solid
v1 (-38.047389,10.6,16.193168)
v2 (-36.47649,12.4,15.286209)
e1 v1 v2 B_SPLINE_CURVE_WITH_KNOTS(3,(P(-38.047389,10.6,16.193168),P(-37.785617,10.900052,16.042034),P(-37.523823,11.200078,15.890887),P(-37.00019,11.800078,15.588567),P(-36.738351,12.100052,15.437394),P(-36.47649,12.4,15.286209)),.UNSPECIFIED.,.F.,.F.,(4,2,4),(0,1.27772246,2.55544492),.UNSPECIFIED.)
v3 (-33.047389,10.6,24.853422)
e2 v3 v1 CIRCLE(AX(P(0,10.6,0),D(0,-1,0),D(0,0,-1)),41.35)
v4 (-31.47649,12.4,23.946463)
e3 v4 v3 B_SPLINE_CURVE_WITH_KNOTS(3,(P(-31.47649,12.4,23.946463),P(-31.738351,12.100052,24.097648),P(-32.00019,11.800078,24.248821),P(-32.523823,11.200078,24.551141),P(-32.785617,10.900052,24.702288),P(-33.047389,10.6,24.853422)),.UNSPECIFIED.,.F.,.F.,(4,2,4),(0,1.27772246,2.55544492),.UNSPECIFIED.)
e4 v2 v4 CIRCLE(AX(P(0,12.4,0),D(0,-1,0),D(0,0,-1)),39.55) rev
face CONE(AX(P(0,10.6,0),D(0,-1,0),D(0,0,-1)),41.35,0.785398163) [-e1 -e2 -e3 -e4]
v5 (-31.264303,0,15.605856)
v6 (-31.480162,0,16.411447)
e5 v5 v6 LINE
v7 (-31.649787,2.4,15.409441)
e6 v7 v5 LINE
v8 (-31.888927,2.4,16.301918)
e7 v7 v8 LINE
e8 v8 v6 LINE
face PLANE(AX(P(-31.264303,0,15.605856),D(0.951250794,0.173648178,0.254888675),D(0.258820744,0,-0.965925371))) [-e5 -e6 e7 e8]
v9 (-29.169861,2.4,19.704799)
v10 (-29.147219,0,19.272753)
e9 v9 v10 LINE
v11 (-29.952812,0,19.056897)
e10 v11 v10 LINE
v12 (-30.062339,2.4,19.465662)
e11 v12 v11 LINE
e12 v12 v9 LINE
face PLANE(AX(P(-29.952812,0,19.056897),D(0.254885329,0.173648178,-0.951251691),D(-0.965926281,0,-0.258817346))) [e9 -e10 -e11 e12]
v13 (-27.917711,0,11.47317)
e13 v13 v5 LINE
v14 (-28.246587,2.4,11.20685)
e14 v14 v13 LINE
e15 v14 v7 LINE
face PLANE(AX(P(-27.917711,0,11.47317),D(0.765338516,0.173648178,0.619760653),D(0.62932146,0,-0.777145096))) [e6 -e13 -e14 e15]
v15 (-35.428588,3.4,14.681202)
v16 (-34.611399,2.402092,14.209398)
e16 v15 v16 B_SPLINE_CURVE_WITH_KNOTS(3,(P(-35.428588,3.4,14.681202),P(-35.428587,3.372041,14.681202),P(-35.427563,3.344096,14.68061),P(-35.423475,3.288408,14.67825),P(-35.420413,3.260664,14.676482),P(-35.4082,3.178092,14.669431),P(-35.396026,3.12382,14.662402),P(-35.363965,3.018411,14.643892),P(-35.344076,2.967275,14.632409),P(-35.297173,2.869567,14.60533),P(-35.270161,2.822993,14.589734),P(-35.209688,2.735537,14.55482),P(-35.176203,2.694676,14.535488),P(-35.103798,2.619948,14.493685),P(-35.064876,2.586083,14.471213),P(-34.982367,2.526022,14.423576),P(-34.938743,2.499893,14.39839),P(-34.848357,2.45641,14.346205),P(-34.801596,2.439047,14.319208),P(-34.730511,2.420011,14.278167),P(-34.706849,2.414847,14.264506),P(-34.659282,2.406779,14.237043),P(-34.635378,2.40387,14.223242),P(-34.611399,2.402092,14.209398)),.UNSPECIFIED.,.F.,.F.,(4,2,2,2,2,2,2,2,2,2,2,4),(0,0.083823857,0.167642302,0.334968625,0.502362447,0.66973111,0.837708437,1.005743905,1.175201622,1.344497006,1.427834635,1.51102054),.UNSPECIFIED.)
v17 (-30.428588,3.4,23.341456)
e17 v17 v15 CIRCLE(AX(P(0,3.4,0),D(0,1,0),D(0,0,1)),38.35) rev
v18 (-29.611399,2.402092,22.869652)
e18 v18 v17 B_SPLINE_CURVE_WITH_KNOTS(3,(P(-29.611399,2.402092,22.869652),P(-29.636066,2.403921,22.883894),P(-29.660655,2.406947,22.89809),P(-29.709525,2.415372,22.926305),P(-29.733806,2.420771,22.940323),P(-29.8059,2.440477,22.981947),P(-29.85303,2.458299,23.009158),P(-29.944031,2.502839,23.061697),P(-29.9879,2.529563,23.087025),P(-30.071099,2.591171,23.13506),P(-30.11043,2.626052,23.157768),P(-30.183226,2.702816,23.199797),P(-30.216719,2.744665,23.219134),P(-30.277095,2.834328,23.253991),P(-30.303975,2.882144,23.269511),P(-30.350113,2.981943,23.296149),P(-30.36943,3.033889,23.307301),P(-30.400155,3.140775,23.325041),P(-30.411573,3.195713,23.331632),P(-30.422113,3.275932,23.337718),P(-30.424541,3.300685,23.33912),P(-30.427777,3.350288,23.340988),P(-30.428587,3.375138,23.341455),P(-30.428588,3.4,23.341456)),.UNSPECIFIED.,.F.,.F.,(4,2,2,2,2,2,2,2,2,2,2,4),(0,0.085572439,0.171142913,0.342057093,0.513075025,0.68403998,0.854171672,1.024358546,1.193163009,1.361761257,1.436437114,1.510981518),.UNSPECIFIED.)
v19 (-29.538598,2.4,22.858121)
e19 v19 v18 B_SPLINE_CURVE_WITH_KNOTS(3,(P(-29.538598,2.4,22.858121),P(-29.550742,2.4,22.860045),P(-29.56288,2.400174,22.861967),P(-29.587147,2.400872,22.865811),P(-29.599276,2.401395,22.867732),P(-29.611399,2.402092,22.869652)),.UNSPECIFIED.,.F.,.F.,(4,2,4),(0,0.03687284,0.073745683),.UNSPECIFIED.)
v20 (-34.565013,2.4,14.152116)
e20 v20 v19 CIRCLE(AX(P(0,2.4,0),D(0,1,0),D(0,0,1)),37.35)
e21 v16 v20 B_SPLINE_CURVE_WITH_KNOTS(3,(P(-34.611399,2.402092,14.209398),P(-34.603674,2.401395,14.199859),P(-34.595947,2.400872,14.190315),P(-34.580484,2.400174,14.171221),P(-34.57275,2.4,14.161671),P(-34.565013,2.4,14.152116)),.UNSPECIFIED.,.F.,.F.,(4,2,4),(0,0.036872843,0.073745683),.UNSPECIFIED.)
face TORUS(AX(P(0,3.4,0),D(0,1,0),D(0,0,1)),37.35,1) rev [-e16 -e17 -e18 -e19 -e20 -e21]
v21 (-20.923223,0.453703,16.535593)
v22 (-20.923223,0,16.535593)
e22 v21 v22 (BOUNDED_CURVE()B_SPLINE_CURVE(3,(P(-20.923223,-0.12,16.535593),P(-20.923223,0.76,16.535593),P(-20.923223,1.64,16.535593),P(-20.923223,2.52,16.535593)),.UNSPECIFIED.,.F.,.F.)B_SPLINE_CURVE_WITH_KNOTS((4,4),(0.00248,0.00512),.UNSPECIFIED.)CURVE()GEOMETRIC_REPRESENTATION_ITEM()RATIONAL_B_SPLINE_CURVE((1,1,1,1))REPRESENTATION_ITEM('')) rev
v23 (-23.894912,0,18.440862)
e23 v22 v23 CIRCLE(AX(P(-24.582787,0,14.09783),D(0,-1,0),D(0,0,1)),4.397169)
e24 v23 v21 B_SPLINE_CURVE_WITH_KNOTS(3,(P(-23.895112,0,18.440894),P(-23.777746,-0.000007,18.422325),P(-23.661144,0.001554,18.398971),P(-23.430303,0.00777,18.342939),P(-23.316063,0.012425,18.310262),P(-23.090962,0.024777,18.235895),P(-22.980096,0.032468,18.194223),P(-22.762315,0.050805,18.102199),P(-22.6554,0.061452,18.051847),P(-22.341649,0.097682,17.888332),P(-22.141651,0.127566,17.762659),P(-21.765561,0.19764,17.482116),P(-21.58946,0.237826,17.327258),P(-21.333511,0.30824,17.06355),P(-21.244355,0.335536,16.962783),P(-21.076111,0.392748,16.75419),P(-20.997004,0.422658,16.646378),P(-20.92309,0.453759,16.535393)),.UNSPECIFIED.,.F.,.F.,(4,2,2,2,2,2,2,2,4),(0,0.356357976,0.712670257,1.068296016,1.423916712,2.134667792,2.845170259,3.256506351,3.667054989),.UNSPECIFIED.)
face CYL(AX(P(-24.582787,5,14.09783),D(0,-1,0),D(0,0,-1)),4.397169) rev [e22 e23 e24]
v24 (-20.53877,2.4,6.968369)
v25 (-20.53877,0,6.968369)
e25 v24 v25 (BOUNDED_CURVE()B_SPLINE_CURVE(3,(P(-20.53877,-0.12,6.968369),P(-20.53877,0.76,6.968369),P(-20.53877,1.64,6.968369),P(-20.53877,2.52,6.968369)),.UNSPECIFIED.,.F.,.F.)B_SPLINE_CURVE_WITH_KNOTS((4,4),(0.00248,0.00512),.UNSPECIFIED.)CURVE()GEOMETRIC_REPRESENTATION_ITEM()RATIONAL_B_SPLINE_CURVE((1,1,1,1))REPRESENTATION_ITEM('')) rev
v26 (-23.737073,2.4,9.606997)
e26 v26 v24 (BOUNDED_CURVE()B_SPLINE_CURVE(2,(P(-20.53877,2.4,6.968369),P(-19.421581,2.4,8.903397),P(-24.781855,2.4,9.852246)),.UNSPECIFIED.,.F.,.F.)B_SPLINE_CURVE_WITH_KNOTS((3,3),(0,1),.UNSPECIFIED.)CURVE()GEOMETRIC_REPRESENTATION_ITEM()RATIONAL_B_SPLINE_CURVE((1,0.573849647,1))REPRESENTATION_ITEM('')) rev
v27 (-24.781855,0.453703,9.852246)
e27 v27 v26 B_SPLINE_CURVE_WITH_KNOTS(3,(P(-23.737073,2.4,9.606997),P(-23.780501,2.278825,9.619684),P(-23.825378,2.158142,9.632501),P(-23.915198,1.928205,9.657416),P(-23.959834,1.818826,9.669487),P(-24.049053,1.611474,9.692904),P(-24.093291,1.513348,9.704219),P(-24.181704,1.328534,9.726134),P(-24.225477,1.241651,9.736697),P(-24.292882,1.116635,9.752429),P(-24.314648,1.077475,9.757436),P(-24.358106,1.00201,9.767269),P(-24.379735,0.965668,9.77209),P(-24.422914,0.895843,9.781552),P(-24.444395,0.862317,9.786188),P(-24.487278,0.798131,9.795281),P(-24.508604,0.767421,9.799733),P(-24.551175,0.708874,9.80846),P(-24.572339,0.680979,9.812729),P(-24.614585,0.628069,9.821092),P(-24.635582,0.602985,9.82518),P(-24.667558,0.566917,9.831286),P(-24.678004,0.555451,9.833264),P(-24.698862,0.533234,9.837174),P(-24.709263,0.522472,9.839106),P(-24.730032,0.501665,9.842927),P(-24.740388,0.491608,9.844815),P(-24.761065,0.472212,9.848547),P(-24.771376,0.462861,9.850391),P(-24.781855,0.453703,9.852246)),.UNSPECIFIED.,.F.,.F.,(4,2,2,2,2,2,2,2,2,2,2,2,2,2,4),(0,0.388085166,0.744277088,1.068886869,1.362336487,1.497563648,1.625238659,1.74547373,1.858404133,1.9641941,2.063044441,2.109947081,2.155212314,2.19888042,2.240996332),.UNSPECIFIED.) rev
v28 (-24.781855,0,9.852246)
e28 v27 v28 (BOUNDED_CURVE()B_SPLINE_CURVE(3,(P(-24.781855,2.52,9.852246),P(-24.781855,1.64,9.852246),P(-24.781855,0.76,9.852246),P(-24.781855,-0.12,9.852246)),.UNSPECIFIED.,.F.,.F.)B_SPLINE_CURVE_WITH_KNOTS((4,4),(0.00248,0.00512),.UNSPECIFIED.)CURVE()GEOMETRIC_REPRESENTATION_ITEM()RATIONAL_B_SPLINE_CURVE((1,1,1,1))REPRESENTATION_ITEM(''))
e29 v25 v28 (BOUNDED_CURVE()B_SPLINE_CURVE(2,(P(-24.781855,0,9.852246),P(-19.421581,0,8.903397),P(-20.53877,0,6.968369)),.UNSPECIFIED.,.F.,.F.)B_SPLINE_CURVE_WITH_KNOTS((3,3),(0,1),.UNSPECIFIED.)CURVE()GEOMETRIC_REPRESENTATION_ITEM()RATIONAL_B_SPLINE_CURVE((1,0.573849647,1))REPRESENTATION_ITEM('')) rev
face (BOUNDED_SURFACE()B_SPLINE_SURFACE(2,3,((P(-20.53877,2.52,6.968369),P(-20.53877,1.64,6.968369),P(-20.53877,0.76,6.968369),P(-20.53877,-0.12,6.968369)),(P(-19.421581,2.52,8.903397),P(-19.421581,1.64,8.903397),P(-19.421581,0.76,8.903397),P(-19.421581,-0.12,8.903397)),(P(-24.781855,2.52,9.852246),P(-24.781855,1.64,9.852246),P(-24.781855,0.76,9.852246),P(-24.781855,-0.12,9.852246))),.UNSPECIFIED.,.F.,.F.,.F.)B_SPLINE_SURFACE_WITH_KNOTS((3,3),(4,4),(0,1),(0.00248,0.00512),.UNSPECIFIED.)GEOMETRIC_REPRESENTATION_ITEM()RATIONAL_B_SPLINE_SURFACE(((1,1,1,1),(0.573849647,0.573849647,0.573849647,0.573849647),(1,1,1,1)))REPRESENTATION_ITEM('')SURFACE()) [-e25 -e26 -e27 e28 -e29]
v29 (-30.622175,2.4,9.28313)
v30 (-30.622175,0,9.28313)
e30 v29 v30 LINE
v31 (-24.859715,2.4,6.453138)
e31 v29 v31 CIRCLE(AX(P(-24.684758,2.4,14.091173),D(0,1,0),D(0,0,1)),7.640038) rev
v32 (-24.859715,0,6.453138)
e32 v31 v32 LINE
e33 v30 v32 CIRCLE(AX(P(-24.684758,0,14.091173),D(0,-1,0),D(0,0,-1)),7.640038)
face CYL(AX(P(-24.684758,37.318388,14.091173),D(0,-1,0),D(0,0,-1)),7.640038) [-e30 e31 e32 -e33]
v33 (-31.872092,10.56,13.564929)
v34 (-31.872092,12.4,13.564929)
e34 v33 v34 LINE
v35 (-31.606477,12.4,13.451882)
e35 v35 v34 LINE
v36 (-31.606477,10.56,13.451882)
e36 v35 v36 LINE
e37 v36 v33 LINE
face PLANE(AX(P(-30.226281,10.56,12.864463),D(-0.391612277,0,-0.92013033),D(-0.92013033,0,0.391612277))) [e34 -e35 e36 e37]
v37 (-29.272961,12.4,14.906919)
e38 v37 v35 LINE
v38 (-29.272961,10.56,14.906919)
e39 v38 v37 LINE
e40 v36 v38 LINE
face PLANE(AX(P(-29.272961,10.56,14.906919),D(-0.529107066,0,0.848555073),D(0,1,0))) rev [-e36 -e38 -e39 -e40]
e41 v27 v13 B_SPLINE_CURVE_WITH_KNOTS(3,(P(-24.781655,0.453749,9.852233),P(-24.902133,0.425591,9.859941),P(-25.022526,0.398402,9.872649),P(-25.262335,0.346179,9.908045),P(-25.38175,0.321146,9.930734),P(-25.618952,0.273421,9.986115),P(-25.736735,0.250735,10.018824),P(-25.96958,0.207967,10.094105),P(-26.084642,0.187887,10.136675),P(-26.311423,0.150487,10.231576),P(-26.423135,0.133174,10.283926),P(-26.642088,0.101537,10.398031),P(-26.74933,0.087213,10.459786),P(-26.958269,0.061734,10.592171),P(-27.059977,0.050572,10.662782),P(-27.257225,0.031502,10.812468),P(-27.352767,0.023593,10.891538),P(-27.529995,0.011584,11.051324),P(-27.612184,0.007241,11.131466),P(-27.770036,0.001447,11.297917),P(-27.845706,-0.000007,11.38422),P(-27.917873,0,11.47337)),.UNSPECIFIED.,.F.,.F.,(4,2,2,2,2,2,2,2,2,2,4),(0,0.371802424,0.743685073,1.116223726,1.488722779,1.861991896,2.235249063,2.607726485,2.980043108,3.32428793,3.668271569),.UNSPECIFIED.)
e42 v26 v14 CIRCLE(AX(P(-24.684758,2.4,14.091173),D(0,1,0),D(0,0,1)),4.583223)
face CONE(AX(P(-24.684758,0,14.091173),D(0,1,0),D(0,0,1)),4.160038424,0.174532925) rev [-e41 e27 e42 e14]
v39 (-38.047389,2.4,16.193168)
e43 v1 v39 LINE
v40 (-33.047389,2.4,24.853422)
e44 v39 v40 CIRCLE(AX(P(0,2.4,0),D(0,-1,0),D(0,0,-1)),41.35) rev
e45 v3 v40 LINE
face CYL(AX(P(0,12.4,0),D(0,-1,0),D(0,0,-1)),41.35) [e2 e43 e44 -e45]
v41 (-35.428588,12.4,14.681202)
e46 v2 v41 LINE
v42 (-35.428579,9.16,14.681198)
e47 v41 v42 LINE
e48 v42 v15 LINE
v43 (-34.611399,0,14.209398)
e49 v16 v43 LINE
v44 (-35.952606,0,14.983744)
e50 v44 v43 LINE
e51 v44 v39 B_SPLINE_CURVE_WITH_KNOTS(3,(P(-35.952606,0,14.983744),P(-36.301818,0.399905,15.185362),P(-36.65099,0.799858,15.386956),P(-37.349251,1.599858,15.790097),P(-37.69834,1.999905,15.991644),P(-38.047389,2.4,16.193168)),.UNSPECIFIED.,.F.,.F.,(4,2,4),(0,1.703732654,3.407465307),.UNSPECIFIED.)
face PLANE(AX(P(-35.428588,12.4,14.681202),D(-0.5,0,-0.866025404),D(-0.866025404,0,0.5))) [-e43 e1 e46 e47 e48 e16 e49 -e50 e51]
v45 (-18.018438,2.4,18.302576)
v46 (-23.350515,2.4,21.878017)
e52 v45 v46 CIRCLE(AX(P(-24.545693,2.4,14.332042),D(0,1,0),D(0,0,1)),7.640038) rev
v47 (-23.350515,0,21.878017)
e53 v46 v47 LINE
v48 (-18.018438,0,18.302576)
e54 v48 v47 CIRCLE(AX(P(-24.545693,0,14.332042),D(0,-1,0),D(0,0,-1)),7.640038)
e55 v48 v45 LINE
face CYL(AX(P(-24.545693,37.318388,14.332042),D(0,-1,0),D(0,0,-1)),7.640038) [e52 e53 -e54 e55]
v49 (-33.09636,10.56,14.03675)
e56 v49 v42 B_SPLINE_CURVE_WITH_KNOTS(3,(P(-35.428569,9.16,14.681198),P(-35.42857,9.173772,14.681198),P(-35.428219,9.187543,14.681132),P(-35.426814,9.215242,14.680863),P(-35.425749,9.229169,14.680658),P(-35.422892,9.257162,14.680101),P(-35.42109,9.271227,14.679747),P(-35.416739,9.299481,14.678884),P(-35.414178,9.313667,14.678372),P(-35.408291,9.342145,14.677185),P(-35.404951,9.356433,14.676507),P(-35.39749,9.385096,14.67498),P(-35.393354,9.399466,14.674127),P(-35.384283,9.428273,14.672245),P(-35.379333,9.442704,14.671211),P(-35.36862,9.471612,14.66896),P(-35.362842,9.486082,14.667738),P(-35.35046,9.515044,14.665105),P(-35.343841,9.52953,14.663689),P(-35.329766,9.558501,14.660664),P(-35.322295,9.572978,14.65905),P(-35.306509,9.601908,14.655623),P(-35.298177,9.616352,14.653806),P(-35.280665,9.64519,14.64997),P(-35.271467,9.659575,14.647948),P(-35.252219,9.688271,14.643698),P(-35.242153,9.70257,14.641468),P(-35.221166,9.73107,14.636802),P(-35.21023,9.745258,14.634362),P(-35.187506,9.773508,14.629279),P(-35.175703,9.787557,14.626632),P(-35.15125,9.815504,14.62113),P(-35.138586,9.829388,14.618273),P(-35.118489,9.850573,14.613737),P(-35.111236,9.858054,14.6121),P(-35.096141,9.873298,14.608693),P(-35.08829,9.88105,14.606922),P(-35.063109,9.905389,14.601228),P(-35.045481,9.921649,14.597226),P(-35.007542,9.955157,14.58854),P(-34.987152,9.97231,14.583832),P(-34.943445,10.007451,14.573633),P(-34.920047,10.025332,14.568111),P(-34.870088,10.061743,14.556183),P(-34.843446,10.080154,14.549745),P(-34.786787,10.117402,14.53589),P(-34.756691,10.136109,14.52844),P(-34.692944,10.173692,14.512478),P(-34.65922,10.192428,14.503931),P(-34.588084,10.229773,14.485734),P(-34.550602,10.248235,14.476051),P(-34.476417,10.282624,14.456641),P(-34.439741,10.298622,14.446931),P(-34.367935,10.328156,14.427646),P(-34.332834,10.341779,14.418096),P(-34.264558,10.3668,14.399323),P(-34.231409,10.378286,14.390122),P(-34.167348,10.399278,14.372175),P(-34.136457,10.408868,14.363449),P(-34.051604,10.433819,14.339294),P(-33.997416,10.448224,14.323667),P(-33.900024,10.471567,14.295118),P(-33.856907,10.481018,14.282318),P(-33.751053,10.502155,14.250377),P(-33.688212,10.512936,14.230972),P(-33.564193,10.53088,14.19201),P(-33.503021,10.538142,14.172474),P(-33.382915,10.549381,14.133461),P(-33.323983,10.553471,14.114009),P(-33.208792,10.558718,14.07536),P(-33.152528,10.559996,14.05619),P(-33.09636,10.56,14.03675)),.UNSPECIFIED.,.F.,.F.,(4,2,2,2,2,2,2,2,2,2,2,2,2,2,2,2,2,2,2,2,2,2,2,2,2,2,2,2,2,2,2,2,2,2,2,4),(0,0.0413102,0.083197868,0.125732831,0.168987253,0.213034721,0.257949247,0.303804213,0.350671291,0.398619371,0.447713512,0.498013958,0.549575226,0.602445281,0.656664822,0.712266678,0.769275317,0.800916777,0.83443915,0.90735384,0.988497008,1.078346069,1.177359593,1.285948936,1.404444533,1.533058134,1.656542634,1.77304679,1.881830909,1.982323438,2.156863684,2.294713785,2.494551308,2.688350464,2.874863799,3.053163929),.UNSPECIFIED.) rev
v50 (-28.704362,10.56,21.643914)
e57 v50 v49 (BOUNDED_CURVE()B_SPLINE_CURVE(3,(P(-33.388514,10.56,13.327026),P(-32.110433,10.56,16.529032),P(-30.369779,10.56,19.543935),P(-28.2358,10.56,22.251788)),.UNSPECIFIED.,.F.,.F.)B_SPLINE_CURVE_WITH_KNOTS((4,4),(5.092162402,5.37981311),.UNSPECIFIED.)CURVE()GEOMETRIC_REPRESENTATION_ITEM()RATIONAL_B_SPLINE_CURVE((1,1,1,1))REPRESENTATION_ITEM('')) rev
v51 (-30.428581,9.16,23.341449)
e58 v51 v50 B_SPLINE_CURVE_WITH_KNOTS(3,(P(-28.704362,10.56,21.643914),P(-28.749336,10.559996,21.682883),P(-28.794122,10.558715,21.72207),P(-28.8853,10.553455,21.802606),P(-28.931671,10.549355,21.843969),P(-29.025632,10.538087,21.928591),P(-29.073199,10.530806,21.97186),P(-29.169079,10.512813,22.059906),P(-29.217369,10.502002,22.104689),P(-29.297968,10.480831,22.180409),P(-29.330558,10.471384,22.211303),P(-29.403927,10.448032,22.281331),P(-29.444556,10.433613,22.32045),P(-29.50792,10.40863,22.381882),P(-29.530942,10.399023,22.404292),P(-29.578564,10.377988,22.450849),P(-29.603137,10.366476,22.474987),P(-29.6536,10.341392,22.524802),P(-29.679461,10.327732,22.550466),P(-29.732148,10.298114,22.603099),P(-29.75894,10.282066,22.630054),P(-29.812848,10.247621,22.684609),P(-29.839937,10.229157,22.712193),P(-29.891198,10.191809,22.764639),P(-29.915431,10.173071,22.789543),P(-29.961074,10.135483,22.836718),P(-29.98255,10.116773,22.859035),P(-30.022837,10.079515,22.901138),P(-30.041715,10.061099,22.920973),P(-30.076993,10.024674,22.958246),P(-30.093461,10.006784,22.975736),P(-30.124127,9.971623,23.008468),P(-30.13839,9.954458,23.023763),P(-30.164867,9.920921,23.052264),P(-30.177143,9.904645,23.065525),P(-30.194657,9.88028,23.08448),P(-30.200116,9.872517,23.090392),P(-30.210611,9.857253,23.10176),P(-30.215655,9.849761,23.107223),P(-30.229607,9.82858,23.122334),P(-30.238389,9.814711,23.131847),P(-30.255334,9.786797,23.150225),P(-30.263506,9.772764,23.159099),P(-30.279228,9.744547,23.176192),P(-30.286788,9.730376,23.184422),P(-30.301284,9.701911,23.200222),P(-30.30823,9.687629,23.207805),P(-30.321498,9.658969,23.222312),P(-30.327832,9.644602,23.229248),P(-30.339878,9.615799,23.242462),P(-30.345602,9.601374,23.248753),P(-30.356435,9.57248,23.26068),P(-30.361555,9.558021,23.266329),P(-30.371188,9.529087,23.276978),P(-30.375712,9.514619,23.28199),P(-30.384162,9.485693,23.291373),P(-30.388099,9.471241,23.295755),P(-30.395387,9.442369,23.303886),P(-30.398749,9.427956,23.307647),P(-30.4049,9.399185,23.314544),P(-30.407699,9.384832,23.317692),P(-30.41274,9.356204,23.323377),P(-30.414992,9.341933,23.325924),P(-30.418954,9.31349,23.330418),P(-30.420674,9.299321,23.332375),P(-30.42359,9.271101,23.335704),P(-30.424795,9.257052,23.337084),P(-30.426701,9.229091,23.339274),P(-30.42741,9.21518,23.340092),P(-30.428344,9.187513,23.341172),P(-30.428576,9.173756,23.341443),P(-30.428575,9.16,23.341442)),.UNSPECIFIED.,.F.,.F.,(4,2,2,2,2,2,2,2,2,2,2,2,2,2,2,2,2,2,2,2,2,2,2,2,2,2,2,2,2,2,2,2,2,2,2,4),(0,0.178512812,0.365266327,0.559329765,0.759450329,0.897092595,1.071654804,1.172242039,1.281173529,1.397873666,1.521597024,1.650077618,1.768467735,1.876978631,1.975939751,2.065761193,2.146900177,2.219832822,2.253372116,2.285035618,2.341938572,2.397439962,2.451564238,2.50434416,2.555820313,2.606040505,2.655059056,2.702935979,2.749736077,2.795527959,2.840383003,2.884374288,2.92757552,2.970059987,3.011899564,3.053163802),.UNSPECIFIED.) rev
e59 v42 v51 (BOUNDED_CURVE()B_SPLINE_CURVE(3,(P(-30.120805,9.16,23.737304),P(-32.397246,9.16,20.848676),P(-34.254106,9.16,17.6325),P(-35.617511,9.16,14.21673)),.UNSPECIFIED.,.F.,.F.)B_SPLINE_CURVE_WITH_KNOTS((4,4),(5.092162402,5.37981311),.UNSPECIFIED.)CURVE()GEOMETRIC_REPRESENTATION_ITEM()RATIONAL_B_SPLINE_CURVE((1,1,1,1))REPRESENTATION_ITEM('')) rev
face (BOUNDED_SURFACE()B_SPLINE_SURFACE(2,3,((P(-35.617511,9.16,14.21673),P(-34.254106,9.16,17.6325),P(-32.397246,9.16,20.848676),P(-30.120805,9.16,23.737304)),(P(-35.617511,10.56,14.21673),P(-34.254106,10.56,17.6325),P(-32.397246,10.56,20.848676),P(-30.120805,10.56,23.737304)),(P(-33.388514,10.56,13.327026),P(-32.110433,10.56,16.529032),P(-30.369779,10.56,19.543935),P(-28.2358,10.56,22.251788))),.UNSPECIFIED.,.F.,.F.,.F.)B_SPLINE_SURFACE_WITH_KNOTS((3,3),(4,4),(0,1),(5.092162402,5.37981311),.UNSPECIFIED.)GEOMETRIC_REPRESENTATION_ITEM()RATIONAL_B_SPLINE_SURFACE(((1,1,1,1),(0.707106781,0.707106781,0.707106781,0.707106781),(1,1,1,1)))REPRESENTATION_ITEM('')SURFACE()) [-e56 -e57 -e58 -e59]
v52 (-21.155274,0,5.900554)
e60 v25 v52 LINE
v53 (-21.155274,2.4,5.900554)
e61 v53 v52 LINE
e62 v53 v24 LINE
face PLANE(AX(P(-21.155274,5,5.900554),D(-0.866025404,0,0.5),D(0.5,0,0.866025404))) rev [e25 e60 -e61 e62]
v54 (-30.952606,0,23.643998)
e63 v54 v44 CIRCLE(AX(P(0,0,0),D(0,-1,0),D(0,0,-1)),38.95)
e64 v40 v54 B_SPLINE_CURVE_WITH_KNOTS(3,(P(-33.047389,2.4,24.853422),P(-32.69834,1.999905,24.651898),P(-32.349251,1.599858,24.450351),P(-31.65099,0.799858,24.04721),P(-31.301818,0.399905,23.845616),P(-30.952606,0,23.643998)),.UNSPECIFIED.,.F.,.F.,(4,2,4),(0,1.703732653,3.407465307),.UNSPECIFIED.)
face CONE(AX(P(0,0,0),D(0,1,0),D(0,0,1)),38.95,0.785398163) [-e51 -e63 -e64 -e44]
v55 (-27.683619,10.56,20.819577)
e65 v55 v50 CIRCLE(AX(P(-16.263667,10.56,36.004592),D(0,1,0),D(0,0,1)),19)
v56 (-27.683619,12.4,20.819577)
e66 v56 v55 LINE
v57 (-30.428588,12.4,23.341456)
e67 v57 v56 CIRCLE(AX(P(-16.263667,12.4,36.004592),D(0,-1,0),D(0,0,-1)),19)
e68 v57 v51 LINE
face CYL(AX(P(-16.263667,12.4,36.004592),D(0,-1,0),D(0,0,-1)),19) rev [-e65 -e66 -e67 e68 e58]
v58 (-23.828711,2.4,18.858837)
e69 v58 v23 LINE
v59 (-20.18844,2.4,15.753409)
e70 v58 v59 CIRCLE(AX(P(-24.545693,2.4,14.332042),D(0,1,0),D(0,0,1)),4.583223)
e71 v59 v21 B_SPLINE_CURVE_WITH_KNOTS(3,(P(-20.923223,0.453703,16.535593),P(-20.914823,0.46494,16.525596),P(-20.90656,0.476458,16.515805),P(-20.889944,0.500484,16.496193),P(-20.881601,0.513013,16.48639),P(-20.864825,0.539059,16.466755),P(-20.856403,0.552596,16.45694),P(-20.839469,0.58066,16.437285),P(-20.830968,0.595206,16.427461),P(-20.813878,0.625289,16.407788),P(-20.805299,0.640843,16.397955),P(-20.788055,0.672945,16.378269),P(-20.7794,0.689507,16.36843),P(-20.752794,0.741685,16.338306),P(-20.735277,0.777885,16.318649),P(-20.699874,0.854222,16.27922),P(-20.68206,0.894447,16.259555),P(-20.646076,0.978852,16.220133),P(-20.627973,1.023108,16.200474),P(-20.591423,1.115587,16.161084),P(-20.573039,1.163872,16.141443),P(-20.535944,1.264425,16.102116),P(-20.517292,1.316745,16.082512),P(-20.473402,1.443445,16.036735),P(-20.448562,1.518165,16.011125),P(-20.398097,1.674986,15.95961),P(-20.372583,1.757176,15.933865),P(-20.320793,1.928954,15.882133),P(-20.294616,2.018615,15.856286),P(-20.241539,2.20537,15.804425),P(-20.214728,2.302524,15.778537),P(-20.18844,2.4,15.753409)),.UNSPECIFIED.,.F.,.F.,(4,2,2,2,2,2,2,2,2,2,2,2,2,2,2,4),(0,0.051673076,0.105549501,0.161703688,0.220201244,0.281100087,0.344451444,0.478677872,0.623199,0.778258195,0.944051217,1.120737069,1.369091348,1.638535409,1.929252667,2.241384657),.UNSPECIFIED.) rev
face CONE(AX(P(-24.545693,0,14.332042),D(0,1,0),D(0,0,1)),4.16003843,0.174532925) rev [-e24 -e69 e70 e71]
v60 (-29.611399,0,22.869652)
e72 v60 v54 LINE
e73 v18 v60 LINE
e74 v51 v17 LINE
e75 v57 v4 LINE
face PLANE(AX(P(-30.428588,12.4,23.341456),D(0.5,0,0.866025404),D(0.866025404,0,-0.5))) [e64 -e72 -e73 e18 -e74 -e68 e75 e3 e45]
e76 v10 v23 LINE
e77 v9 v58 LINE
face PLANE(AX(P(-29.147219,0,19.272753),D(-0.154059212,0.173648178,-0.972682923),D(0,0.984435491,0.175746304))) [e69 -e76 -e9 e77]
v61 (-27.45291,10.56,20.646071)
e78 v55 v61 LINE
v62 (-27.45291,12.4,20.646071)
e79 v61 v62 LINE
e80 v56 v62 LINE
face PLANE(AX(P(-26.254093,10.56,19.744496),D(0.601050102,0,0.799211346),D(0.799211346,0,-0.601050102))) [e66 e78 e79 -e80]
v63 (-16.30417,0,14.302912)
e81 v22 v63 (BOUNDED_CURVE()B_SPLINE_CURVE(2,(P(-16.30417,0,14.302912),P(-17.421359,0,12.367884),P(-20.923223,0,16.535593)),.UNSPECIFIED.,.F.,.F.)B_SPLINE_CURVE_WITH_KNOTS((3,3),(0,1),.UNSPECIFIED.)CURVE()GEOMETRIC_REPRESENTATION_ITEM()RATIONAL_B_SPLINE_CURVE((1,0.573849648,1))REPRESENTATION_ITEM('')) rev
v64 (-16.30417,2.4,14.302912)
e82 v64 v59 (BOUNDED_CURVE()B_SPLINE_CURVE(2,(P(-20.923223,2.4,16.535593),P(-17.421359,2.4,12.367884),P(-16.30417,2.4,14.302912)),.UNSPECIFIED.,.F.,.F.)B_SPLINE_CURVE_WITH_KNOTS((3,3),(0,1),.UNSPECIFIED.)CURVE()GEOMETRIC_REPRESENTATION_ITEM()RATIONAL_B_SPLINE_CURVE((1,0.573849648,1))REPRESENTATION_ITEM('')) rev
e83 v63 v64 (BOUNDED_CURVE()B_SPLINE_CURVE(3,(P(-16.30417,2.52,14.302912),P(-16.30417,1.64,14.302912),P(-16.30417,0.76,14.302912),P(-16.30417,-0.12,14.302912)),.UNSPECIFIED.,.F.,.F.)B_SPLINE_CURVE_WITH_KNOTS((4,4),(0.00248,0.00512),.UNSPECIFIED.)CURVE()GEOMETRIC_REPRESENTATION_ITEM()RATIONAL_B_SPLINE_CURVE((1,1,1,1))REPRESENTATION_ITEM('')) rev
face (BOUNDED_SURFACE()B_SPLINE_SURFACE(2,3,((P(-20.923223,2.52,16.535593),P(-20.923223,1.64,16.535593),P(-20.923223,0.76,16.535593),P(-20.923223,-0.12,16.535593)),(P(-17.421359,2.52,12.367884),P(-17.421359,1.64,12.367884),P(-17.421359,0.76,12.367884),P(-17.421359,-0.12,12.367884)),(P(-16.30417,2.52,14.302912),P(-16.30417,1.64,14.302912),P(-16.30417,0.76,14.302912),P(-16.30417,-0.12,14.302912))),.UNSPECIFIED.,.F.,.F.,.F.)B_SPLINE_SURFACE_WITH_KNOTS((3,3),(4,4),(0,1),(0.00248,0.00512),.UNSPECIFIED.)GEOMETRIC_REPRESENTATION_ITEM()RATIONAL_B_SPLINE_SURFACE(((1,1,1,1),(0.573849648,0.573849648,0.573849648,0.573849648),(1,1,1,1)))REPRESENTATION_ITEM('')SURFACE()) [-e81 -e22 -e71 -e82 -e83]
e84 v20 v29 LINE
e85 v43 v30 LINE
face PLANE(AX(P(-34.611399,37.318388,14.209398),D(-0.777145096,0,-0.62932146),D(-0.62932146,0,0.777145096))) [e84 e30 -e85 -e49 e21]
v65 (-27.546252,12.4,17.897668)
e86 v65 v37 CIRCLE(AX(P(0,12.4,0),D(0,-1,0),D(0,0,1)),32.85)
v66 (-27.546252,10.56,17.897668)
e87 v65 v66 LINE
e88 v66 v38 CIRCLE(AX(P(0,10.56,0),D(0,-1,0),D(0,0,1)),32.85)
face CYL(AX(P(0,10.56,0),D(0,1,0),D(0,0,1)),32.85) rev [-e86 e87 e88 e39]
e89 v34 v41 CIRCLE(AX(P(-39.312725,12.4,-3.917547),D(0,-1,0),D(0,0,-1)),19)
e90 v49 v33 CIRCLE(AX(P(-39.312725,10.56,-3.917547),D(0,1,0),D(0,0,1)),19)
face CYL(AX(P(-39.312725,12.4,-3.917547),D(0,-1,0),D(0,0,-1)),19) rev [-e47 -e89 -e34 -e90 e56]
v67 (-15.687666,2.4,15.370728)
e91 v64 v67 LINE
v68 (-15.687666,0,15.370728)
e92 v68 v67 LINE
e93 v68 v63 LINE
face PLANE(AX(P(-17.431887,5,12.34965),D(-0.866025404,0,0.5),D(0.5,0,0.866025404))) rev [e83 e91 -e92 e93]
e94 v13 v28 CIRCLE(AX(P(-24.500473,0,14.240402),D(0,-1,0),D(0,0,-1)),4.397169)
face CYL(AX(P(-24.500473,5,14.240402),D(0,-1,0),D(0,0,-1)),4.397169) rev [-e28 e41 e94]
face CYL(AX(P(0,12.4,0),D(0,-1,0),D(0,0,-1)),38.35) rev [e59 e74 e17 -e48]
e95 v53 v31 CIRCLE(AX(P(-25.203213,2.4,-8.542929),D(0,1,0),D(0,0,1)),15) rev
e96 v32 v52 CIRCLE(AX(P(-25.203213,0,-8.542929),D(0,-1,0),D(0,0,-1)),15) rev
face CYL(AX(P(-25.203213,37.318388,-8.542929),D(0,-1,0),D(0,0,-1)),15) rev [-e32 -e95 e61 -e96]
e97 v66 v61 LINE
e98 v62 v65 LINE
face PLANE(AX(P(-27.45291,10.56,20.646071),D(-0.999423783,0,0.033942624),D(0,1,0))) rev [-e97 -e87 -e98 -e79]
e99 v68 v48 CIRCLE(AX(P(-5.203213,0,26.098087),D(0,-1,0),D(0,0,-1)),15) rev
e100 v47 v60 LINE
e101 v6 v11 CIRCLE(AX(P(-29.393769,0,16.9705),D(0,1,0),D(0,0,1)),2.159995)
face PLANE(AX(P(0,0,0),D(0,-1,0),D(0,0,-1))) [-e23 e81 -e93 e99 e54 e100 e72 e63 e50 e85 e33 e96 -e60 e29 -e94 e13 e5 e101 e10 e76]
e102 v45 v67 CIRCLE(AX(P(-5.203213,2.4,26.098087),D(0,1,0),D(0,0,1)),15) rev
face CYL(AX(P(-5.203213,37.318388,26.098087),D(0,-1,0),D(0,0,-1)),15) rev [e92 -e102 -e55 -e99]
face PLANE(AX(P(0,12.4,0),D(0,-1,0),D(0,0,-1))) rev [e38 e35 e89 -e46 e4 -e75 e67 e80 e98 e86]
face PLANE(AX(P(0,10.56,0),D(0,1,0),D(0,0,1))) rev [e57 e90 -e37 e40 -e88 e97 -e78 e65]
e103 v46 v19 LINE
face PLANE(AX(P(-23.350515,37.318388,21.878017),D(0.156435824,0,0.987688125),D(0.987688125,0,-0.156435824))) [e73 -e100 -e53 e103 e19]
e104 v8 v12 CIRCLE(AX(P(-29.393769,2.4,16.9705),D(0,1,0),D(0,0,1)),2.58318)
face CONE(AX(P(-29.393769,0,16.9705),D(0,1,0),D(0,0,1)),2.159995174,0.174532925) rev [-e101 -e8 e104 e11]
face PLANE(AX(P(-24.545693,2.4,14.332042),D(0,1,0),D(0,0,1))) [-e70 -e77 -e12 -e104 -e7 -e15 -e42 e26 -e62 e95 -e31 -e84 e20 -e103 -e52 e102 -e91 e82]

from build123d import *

# Parameters (mm, degrees)
EXTRUDE_1_DEPTH     = 2.4
EXTRUDE_1_DRAFT     = 10.000000000000021
EXTRUDE_2_DEPTH     = 12.4
EXTRUDE_4_DEPTH     = 2.4
EXTRUDE_START       = -1.84
EXTRUDE_3_DEPTH     = 1.84
CHAMFER_1_SIZE      = 2.4
FILLET_3_R          = 1
FILLET_4_R          = 19
CHAMFER_2_SIZE      = 1.5
CHAMFER_3_SIZE      = 1.5
FILLET_5_SIZE       = 2.4
FILLET_5_SIZE_2     = 1.4
FILLET_8_R          = 15
CUT_EXTRUDE_2_DEPTH = 5
FILLET_6_DEPTH      = 2.4
FILLET_7_DEPTH      = 2.4
CHAMFER_4_SIZE      = 1.8


with BuildPart() as part:
    # 草图1 → 凸台-拉伸1 (with draft: the straight prism first)
    with BuildSketch(Plane(origin=(0, 0, 0), x_dir=(1, 0, 0), z_dir=(0, 1, 0))):
        with BuildLine():
            Line((-8, -10.39230484541326), (-13.000000000000005, -1.7320508075688719))
            Line((-13.000000000000005, -1.7320508075688719), (-21.967816979362475, -6.909622354647092))
            Line((-21.967816979362475, -6.909622354647092), (-22.707399570917065, -6.711454425652112))
            ThreePointArc((-22.707399570917065, -6.711454425652112), (-27.04566788326862, -6.825066693061728), (-30.6221750608845, -9.283130179980438))
            Line((-30.6221750608845, -9.283130179980438), (-34.43427486961312, -13.990668154170681))
            Line((-34.43427486961312, -13.990668154170681), (-34.61139932518726, -14.209398025530225))
            Line((-34.61139932518726, -14.209398025530225), (-35.428587503869785, -14.681201840470763))
            ThreePointArc((-35.428587503869785, -14.681201840470763), (-33.21207423513341, -19.174999999999695), (-30.428587503869863, -23.341455878315195))
            Line((-30.428587503869863, -23.341455878315195), (-29.611399325157414, -22.86965206335739))
            Line((-29.611399325157414, -22.86965206335739), (-29.333411472153603, -22.825622720870605))
            Line((-29.333411472153603, -22.825622720870605), (-23.35051542170495, -21.878016642325832))
            ThreePointArc((-23.35051542170495, -21.878016642325832), (-19.4335158344601, -20.009702780252802), (-17.165989990997385, -16.309458328474033))
            Line((-17.165989990997385, -16.309458328474033), (-16.967816979363704, -15.569876392492032))
            Line((-16.967816979363704, -15.569876392492032), (-8, -10.39230484541326))
        make_face()
        with BuildLine():
            Line((-27.917710857810967, -11.473169762795624), (-31.26430328260419, -15.605855608999667))
            Line((-31.26430328260419, -15.605855608999667), (-31.480162480983196, -16.41144743799068))
            ThreePointArc((-31.480162480983196, -16.41144743799068), (-31.264379416774442, -18.05049776957139), (-29.95281180657393, -19.056896658743568))
            Line((-29.95281180657393, -19.056896658743568), (-29.147219046463054, -19.272753069842064))
            Line((-29.147219046463054, -19.272753069842064), (-23.894912087940103, -18.440861965883116))
            ThreePointArc((-23.894912087940103, -18.440861965883116), (-21.762087000118, -17.42355577622036), (-20.527408297941975, -15.40875473364509))
            Line((-20.527408297941975, -15.40875473364509), (-19.958845574370134, -13.286877913181291))
            ThreePointArc((-19.958845574370134, -13.286877913181291), (-20.174626779333174, -11.64782603948194), (-21.486196868626088, -10.641428268238217))
            Line((-21.486196868626088, -10.641428268238217), (-23.608077089277337, -10.072879719767714))
            ThreePointArc((-23.608077089277337, -10.072879719767714), (-25.970285289887677, -10.134742247833366), (-27.917710857810967, -11.473169762795624))
        make_face(mode=Mode.SUBTRACT)
    extrude(amount=EXTRUDE_1_DEPTH)
    # 凸台-拉伸1: the draft: its side faces are tilted about the plane it starts from
    extrude_1_sides = [part.faces().sort_by_distance(p)[0] for p in [
        (-12.48390849, 1.2, 12.981090619),
        (-29.59100707, 1.2, 13.539512686),
        (-31.372232882, 1.2, 16.008651523),
        (-31.264379417, 1.2, 18.05049777),
        (-29.550015427, 1.2, 19.164824864),
        (-26.521065567, 1.2, 18.856807518),
        (-21.762087, 1.2, 17.423555776),
        (-20.243126936, 1.2, 14.347816323),
        (-20.174626779, 1.2, 11.647826039),
        (-22.547136979, 1.2, 10.357153994),
        (-25.97028529, 1.2, 10.134742248),
        (-19.433515834, 1.2, 20.00970278),
        (-26.480957373, 1.2, 22.373834353),
        (-30.019993415, 1.2, 23.105553971),
        (-33.212074235, 1.2, 19.175),
        (-35.019993415, 1.2, 14.445299933),
        (-32.616787193, 1.2, 11.746264103),
        (-27.045667883, 1.2, 6.825066693),
        (-22.337608275, 1.2, 6.81053839),
        (-17.48390849, 1.2, 4.320836581),
        (-10.5, 1.2, 6.062177826),
        (-17.066903485, 1.2, 15.93966736),
    ]]
    draft(extrude_1_sides, Plane(origin=(0, 0, 0), x_dir=(1, 0, 0), z_dir=(0, 1, 0)), EXTRUDE_1_DRAFT)



with BuildPart() as body_2:
    # 草图3 → 凸台-拉伸2 (new body)
    with BuildSketch(Plane.XZ):
        with BuildLine():
            Line((-30.428587503869863, 23.341455878315195), (-33.04738914463361, 24.853421710564383))
            ThreePointArc((-33.04738914463361, 24.853421710564383), (-35.81015044648663, 20.67499999999986), (-38.04738914463341, 16.193167672720275))
            Line((-38.04738914463341, 16.193167672720275), (-35.42858750386978, 14.681201840470765))
            ThreePointArc((-35.42858750386978, 14.681201840470765), (-33.21207423513341, 19.17499999999969), (-30.428587503869863, 23.341455878315195))
        make_face()
    extrude(amount=-EXTRUDE_2_DEPTH)


with BuildPart() as part_1:
    add(part.part)

    add(body_2.part)  # 凸台-拉伸4 merges body 2
    # 草图2 → 凸台-拉伸4 (add)
    with BuildSketch(Plane.XZ):
        with BuildLine():
            Line((-13.000000000000005, 1.7320508075688719), (-8, 10.39230484541326))
            Line((-8, 10.39230484541326), (-16.967816979363704, 15.569876392492032))
            Line((-16.967816979363704, 15.569876392492032), (-17.165989990997385, 16.309458328474033))
            ThreePointArc((-17.165989990997385, 16.309458328474033), (-19.433515834460025, 20.009702780252884), (-23.35051542170494, 21.878016642325914))
            Line((-23.35051542170494, 21.878016642325914), (-29.611399325157414, 22.86965206335739))
            Line((-29.611399325157414, 22.86965206335739), (-30.428587503869863, 23.341455878315195))
            ThreePointArc((-30.428587503869863, 23.341455878315195), (-33.21207423513341, 19.17499999999969), (-35.428587503869785, 14.681201840470749))
            Line((-35.428587503869785, 14.681201840470749), (-34.61139932518726, 14.209398025530225))
            Line((-34.61139932518726, 14.209398025530225), (-30.6221750608845, 9.283130179980438))
            ThreePointArc((-30.6221750608845, 9.283130179980438), (-27.04566788326878, 6.825066693061228), (-22.707399570916962, 6.7114544256517314))
            Line((-22.707399570916962, 6.7114544256517314), (-21.967816979362475, 6.909622354647092))
            Line((-21.967816979362475, 6.909622354647092), (-13.000000000000005, 1.7320508075688719))
        make_face()
        Polygon((-28.267922287633624, 9.69566060346451), (-32.99491205073382, 15.569876392492032), (-31.81295668178173, 19.594100965997992), (-26.34681601079053, 20.919608689289614), (-19.04027200355443, 17.12116385307054), (-18.489608424453053, 9.956624945753184), (-26.729419610491885, 8.295337377312261), align=None, mode=Mode.SUBTRACT)
    extrude(amount=-EXTRUDE_4_DEPTH)

    # 草图4 → 凸台-拉伸3 (add)
    with BuildSketch(Plane(origin=(0, 12.4, 0), x_dir=(1, 0, 0), z_dir=(0, 1, 0)).offset(EXTRUDE_START)):
        with BuildLine():
            Line((-30.226281339811546, -12.864463314361807), (-38.04738914463341, -16.19316767272028))
            ThreePointArc((-38.04738914463341, -16.19316767272028), (-35.81015044648664, -20.674999999999862), (-33.04738914463361, -24.853421710564383))
            Line((-33.04738914463361, -24.853421710564383), (-26.254092706196243, -19.74449584503119))
            ThreePointArc((-26.254092706196243, -19.74449584503119), (-28.4489345143189, -16.424999999999862), (-30.226281339811546, -12.864463314361807))
        make_face()
    extrude(amount=EXTRUDE_3_DEPTH)

    # 倒角1
    chamfer_1_edges = [part_1.edges().sort_by_distance(p)[0] for p in [
        (-35.81015044648664, 0, 20.674999999999848),
    ]]
    chamfer(chamfer_1_edges, length=CHAMFER_1_SIZE)

    # 圆角3
    fillet_3_edges = [part_1.edges().sort_by_distance(p)[0] for p in [
        (-33.21207423513341, 2.4, 19.174999999999685),
    ]]
    fillet(fillet_3_edges, radius=FILLET_3_R)

    # 圆角4
    # the kernel refuses this fillet: 19 mm, written as the material it adds along each edge
    with BuildSketch(Plane(origin=(-30.64975510753807, 12.4, 23.050271405082075), x_dir=(0.6048533830099544, 0, 0.7963368540143131), z_dir=(0, -1, 0))) as fillet_4_piece_1:
        with BuildLine():
            CenterArc((19.01747725145387, -3.620707526685834), FILLET_4_R, 169.01432561321406, 11.258823825178695)
            Line((0.01769316413072922, -3.711286967523243), (0, 0))
            ThreePointArc((0, 0), (0.1828274503215999, 0.00043580269250474), (0.36565490064319695, 1e-17))
        make_face()
    extrude(amount=1.8399999999999999)
    with BuildSketch(Plane(origin=(-35.28699815469627, 12.4, 15.018330840358463), x_dir=(-0.38722125404118524, 0, -0.9219868222587414), z_dir=(0, -1, 0))) as fillet_4_piece_2:
        with BuildLine():
            CenterArc((19.01747725145391, 3.620707526687544), FILLET_4_R, 179.7268505616068, 11.258823825184436)
            Line((0.01769316413076899, 3.7112869675251012), (0, 0))
            ThreePointArc((0, 0), (0.1828274503217857, -0.00043580269250211), (0.36565490064356865, -1e-17))
        make_face()
    extrude(amount=1.8399999999999999)

    # 倒角2
    # the kernel refuses this chamfer: 2.14222201, 1.5 mm, written as the material it takes off along each edge
    with BuildSketch(Plane(origin=(-30.226281339811543, 4.744273175478047, 12.864463314361808), x_dir=(-0.9201303299790425, 0, 0.3916122774539359), z_dir=(0, 1, 0))) as chamfer_2_piece_1:
        with BuildLine():
            Line((CHAMFER_2_SIZE, 1e-17), (-0.07732795533825856, 2.2526577753949484))
            ThreePointArc((-0.07732795533825856, 2.2526577753949484), (-0.02059122506408261, 1.1629357197030856), (0, 0))
            Line((0, 0), (CHAMFER_2_SIZE, 1e-17))
        make_face()
    extrude(amount=13.471453649043909, mode=Mode.SUBTRACT)

    # 倒角3
    # the kernel refuses this chamfer: 2.14222201, 1.5 mm, written as the material it takes off along each edge
    with BuildSketch(Plane(origin=(-26.254092706196246, 4.744273175477979, 19.74449584503119), x_dir=(-0.5732775613281392, 0, -0.8193612375977165), z_dir=(0, 1, 0))) as chamfer_3_piece_1:
        with BuildLine():
            Line((2.253984619673398, -1.7e-16), (-CHAMFER_3_SIZE * 0.0343072240437, CHAMFER_3_SIZE * 0.999411333925))
            Line((-CHAMFER_3_SIZE * 0.0343072240437, CHAMFER_3_SIZE * 0.999411333925), (0, 0))
            ThreePointArc((0, 0), (1.1629575666695002, 0.0193179925758491), (2.253984619673398, -1.7e-16))
        make_face()
    extrude(amount=13.471453649044044, mode=Mode.SUBTRACT)

    # 圆角5
    # a fillet whose section is not a circle: 2.4, 1.4 mm, written as the material it adds along each edge
    with BuildSketch(Plane(origin=(-2.0606e-13, 10.56, 1.3323e-13), x_dir=(-0.7992113456985149, 0, 0.601050101827434), z_dir=(0.601050101827434, 0, 0.7992113456985149))) as fillet_5_piece_1:
        with BuildLine():
            Bezier((38.34999999999976 - FILLET_5_SIZE, 0), (38.34999999999976, 0), (38.34999999999976, FILLET_5_SIZE_2), weights=[1, 0.7071067811865476, 1])
            Line((38.34999999999976, FILLET_5_SIZE_2), (38.34999999999976, 0))
            Line((38.34999999999976, 0), (38.34999999999976 - FILLET_5_SIZE, 0))
        make_face()
    revolve(axis=Axis((-2.0606e-13, 10.56, 1.3323e-13), (0, -1, 0)), revolution_arc=13.890285454944133)
    with BuildSketch(Plane(origin=(-3.461387621e-08, 10.56, 2.627939821e-08), x_dir=(-0.7992113457016207, 0, 0.6010501018233042), z_dir=(-0.6010501018233042, 0, -0.7992113457016207))) as fillet_5_piece_2_section:
        with BuildLine():
            Bezier((38.34999995654087 - FILLET_5_SIZE, 0), (38.34999995654051, 0), (38.34999995654051, -FILLET_5_SIZE_2), weights=[1, 0.7071067811865476, 1])
            Line((38.34999995654051, -FILLET_5_SIZE_2), (38.34999995654087, 0))
            Line((38.34999995654087, 0), (38.34999995654087 - FILLET_5_SIZE, 0))
        make_face()
    fillet_5_piece_2 = revolve(axis=Axis((-3.461387621e-08, 10.56, 2.627939821e-08), (0, 1, 0)), revolution_arc=9.510436623291234, mode=Mode.PRIVATE)
    fillet_5_piece_2 = fillet_5_piece_2 - Plane(origin=(-16.263666814571195, 10.56, 36.004592214384765), x_dir=(0.6048533830101342, 0, 0.7963368540141766), z_dir=(0, 1, 0)) * Cylinder(19, 154, mode=Mode.PRIVATE)
    fillet_5_piece_2 = split(fillet_5_piece_2, bisect_by=Plane(origin=(2.499999962665584, 10.56, 4.330127040493212), z_dir=(-0.4999999999996767, 0, -0.8660254037846254)), keep=Keep.TOP, mode=Mode.PRIVATE)
    add(fillet_5_piece_2)
    with BuildSketch(Plane(origin=(-4.006483323e-08, 10.56, 1.683765483e-08), x_dir=(-0.9201303299770334, 0, 0.39161227745865645), z_dir=(0.39161227745865645, 0, 0.9201303299770334))) as fillet_5_piece_3_section:
        with BuildLine():
            Bezier((38.34999995654088 - FILLET_5_SIZE, 0), (38.34999995654086, 0), (38.34999995654086, FILLET_5_SIZE_2), weights=[1, 0.7071067811865476, 1])
            Line((38.34999995654086, FILLET_5_SIZE_2), (38.34999995654088, 0))
            Line((38.34999995654088, 0), (38.34999995654088 - FILLET_5_SIZE, 0))
        make_face()
    fillet_5_piece_3 = revolve(axis=Axis((-4.006483323e-08, 10.56, 1.683765483e-08), (0, -1, 0)), revolution_arc=9.510436623292696, mode=Mode.PRIVATE)
    fillet_5_piece_3 = fillet_5_piece_3 - Plane(origin=(-39.312724917839226, 10.56, -3.9175474870895535), x_dir=(-0.38722125404093544, 0, -0.9219868222588462), z_dir=(0, 1, 0)) * Cylinder(19, 154, mode=Mode.PRIVATE)
    fillet_5_piece_3 = split(fillet_5_piece_3, bisect_by=Plane(origin=(-2.5000000373308557, 10.56, -4.330126997352951), z_dir=(0.4999999999996709, 0, 0.8660254037846287)), keep=Keep.TOP, mode=Mode.PRIVATE)
    add(fillet_5_piece_3)

    # 圆角8
    fillet_8_edges = [part_1.edges().sort_by_distance(p)[0] for p in [
        (-16.967816979363704, 1.2, 15.569876392492032),
        (-21.967816979362475, 1.2, 6.909622354647092),
    ]]
    fillet(fillet_8_edges, radius=FILLET_8_R)

    # 草图5 → 切除-拉伸2 (cut)
    with BuildSketch(Plane.XZ):
        with BuildLine():
            Line((-29.147219046463054, 19.272753069842064), (-31.26430328260419, 15.605855608999667))
            Line((-31.26430328260419, 15.605855608999667), (-27.917710857810967, 11.473169762795624))
            ThreePointArc((-27.917710857810967, 11.473169762795624), (-26.519580592002317, 10.334215480262145), (-24.78185492305829, 9.852245981886409))
            ThreePointArc((-24.78185492305829, 9.852245981886409), (-22.06180246526334, 9.58692328939854), (-19.411053683835984, 8.921632073413566))
            Line((-19.411053683835984, 8.921632073413566), (-21.15527408053382, 5.900553726782096))
            Line((-21.15527408053382, 5.900553726782096), (-15.208253993285949, -4.420406034748125))
            Line((-15.208253993285949, -4.420406034748125), (0.1921696049414131, 10.177783304028027))
            Line((0.1921696049414131, 10.177783304028027), (-15.687666464212418, 15.370727913953607))
            Line((-15.687666464212418, 15.370727913953607), (-17.43188686086262, 12.34964956740465))
            ThreePointArc((-17.43188686086262, 12.34964956740465), (-19.33342034539163, 14.31261974261085), (-20.923222766188925, 16.535592923816857))
            ThreePointArc((-20.923222766188925, 16.535592923816857), (-22.209483528439453, 17.799522767055162), (-23.894912087940103, 18.440861965883116))
            Line((-23.894912087940103, 18.440861965883116), (-29.147219046463054, 19.272753069842064))
        make_face()
    extrude(amount=-CUT_EXTRUDE_2_DEPTH, mode=Mode.SUBTRACT)

    # 圆角6: read off the stored shape, not the designer's step
    # 圆角6 outline → 圆角6 (cut)
    with BuildSketch(Plane(origin=(0, 0, 0), x_dir=(1, 0, 0), z_dir=(0, 1, 0))):
        with BuildLine():
            Line((-19.411053684, -8.921632073), (-20.538770468, -6.968369307))
            add(Edge.make_bspline(
                [(-20.538770468, -6.968369307), (-19.4215814226651, -8.903397494873008), (-24.781854923, -9.852245982)],
                knots=[0, 0, 0, 1, 1, 1], degree=2, weights=[1, 0.573849647048003, 1]))
            ThreePointArc((-24.781854923, -9.852245982), (-22.061802466, -9.586923289), (-19.411053684, -8.921632073))
        make_face()
    extrude(amount=FILLET_6_DEPTH, mode=Mode.SUBTRACT)

    # 圆角7: read off the stored shape, not the designer's step
    # 圆角7 outline → 圆角7 (cut)
    with BuildSketch(Plane(origin=(0, 0, 0), x_dir=(1, 0, 0), z_dir=(0, 1, 0))):
        with BuildLine():
            ThreePointArc((-17.431886861, -12.349649567), (-19.333420346, -14.312619744), (-20.923222767, -16.535592926))
            add(Edge.make_bspline(
                [(-20.923222767, -16.535592926), (-17.4213591171029, -12.3678841544852), (-16.304170077, -14.302912333)],
                knots=[0, 0, 0, 1, 1, 1], degree=2, weights=[1, 0.573849647800654, 1]))
            Line((-16.304170077, -14.302912333), (-17.431886861, -12.349649567))
        make_face()
    extrude(amount=FILLET_7_DEPTH, mode=Mode.SUBTRACT)

    # 倒角4
    chamfer_4_edges = [part_1.edges().sort_by_distance(p)[0] for p in [
        (-35.81015044648664, 12.4, 20.674999999999848),
    ]]
    chamfer(chamfer_4_edges, length=CHAMFER_4_SIZE)


solid = part_1.part
